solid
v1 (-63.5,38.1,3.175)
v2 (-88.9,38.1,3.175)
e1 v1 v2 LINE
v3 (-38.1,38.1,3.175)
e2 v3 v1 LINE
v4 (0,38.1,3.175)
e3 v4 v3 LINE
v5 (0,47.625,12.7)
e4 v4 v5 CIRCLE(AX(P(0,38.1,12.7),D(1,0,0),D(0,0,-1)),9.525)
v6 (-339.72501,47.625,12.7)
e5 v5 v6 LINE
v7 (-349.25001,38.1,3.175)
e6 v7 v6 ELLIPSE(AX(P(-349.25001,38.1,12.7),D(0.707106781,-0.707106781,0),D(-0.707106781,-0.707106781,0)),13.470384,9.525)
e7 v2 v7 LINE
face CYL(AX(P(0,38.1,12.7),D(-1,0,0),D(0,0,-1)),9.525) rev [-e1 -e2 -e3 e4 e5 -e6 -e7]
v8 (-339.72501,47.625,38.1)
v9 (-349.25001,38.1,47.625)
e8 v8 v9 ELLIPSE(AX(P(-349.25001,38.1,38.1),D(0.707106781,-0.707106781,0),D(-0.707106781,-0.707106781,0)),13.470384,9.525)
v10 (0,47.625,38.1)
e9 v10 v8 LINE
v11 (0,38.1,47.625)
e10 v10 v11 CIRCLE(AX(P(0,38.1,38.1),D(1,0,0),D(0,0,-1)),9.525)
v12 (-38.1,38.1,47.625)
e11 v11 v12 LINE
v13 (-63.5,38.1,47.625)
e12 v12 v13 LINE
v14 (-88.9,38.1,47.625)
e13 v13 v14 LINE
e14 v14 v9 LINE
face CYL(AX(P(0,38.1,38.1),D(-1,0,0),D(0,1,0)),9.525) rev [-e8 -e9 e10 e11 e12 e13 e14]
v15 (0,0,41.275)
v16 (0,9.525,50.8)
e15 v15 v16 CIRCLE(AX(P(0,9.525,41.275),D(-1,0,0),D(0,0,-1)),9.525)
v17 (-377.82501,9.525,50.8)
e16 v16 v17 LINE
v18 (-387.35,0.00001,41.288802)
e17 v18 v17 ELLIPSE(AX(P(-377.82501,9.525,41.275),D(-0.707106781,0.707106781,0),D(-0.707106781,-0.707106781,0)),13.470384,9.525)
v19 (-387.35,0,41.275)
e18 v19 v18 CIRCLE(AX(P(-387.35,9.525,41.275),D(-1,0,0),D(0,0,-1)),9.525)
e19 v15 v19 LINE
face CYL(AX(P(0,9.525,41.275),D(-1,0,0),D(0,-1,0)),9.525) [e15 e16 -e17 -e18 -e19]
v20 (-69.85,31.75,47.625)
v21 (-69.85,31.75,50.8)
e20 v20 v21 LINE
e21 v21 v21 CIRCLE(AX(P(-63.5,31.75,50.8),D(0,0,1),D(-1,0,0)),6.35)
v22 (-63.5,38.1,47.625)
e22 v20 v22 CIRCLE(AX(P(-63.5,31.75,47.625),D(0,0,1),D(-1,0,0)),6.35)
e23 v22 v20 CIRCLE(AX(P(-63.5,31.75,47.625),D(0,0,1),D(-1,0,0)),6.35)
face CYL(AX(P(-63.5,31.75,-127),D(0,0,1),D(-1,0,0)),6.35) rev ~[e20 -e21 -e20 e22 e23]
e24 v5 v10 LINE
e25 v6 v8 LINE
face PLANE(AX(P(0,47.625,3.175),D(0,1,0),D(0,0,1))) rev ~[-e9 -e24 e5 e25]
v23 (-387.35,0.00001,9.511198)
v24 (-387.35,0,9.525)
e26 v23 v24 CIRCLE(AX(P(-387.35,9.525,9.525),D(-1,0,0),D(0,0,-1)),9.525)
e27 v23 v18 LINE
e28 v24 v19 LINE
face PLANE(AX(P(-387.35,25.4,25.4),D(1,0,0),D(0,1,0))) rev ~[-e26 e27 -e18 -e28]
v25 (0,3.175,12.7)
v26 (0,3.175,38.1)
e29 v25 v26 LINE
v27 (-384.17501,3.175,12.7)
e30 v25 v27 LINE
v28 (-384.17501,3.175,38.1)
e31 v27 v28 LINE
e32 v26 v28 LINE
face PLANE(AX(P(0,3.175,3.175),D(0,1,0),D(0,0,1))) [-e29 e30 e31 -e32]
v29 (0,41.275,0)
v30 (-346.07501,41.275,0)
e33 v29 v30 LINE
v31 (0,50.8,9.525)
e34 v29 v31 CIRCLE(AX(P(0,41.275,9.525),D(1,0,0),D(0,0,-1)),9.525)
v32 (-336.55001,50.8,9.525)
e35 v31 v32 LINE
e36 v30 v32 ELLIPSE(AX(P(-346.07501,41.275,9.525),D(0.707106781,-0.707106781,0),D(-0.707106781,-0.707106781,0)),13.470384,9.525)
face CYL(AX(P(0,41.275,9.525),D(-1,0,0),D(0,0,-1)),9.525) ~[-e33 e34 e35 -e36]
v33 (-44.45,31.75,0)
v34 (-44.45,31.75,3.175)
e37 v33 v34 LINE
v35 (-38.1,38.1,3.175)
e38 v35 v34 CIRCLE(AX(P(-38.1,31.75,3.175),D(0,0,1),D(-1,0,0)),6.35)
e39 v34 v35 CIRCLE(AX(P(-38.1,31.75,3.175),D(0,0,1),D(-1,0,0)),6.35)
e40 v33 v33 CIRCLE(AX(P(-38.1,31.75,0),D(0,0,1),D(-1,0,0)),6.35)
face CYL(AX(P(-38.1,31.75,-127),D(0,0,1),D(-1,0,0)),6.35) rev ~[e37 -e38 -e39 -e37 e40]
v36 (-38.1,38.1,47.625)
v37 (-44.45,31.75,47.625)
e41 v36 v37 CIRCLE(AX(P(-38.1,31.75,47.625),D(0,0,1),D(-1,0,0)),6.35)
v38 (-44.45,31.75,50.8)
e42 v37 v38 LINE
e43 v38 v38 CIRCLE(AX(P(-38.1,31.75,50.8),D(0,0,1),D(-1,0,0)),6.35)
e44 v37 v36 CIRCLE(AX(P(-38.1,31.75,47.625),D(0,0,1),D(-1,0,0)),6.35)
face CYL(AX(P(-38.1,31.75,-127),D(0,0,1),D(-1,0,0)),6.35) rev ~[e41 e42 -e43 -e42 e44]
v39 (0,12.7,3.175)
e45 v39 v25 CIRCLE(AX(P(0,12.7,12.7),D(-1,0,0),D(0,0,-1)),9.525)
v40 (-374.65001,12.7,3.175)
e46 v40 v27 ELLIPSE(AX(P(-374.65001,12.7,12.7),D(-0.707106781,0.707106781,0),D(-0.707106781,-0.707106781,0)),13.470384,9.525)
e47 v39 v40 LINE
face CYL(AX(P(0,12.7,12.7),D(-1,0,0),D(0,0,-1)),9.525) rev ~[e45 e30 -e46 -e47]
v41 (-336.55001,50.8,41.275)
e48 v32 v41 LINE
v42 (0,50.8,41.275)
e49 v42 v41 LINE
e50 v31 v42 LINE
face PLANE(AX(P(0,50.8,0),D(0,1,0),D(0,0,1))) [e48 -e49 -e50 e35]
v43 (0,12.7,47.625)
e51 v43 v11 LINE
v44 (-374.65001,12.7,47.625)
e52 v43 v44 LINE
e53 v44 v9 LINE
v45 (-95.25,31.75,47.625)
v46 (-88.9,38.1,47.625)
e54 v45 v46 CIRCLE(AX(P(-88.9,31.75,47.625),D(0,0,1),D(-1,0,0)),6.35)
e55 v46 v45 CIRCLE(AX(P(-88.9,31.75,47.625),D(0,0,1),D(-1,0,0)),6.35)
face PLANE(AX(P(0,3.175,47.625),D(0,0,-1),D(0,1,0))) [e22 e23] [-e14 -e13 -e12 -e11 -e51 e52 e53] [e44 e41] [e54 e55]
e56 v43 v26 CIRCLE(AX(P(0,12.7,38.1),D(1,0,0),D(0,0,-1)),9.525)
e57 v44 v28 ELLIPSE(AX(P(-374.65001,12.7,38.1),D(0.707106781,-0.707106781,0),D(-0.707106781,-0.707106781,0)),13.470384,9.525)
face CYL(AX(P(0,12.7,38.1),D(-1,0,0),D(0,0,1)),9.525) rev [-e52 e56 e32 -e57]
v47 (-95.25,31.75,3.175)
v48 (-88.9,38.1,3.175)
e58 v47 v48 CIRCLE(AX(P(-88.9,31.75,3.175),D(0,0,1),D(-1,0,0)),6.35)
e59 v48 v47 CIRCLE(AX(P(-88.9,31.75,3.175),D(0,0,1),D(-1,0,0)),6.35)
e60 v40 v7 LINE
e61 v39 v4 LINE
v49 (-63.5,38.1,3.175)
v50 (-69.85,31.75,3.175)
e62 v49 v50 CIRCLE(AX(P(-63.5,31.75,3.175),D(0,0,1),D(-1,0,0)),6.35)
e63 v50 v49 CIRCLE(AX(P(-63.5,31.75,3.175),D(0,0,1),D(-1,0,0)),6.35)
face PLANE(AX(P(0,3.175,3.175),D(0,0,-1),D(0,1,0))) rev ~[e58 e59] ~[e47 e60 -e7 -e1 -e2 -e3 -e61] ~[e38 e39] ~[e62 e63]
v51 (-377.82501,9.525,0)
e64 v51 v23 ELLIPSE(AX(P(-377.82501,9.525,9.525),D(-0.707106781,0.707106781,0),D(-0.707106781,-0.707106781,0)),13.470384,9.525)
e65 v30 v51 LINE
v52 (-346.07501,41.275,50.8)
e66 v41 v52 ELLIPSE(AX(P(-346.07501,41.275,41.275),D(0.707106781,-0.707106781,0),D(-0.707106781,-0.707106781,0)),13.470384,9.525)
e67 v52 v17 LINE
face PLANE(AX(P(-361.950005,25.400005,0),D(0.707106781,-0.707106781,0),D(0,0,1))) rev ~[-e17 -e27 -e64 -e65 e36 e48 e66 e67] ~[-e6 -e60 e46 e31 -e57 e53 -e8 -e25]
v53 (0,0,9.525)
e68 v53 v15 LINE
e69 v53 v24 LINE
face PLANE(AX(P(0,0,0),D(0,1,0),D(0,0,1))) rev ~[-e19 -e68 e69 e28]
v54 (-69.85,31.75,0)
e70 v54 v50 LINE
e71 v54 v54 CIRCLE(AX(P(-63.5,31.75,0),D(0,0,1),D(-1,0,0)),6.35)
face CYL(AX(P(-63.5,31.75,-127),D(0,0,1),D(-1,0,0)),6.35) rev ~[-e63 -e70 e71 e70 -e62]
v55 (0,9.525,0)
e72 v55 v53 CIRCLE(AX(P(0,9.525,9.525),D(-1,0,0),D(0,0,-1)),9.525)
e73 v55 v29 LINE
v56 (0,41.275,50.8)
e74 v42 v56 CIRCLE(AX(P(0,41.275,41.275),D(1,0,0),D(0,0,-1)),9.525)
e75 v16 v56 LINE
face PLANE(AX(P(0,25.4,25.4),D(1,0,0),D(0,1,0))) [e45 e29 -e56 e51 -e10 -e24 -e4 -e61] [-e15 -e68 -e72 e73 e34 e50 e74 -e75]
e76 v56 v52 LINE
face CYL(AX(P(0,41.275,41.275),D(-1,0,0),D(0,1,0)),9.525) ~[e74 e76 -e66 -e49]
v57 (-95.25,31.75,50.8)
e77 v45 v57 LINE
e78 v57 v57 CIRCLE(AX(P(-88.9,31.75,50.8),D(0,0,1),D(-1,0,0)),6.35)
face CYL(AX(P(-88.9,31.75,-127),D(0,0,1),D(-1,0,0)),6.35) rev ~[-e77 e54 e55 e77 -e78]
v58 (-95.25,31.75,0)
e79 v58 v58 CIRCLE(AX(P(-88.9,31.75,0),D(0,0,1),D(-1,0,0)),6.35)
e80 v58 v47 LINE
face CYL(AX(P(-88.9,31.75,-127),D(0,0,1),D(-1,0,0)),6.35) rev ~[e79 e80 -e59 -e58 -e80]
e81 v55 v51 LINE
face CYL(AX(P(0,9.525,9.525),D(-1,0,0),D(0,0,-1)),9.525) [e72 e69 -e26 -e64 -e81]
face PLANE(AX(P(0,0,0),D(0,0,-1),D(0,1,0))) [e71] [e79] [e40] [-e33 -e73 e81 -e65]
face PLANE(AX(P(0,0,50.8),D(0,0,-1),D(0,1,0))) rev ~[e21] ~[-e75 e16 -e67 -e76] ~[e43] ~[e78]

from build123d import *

# Parameters (mm, degrees)
F0_W     = 50.8
F0_H     = 50.8
F1_DEPTH = 387.35
F2_SIZE  = 50.79999
F3_W     = 44.45
F3_H     = 44.45
F4_DEPTH = 876.3
F5_R     = 9.525
F7_D     = 12.7
F7_DEPTH = 127
F7_TIP   = 3.8154649308


# Not quite as in the source:
# - a fillet or chamfer is up to 0.001 mm smaller than in the source, because OpenCascade refuses the exact size


with BuildPart() as f1:
    # F0 (on Right) → F1 (new body)
    with BuildSketch(Plane.YZ):
        with Locations((25.4, 25.4)):
            Rectangle(F0_W, F0_H)
    extrude(amount=-F1_DEPTH)

    # F2 (size 50.8 in the source; OpenCascade refuses exactly that, so slightly less here)
    f2_edges = [f1.edges().sort_by_distance(p)[0] for p in [
        (-387.35, 50.8, 25.4),
    ]]
    chamfer(f2_edges, length=F2_SIZE)

    # F3 (on face) → F4 (cut)
    with BuildSketch(Plane.YZ):
        with Locations((25.4, 25.4)):
            Rectangle(F3_W, F3_H)
    extrude(amount=-F4_DEPTH, mode=Mode.SUBTRACT)

    # F5
    f5_edges = [f1.edges().sort_by_distance(p)[0] for p in [
        (-192.087505, 3.175, 3.175),
        (-169.862505, 47.625, 3.175),
        (-169.862505, 47.625, 47.625),
        (-192.087505, 3.175, 47.625),
        (-168.275005, 50.8, 0),
        (-168.275005, 50.8, 50.8),
        (-193.675, 0, 50.8),
        (-193.675, 0, 0),
    ]]
    fillet(f5_edges, radius=F5_R)

    # F7
    with Locations(Plane(origin=(0, 0, 0), x_dir=(1, 0, 0), z_dir=(0, 0, -1))):
        with Locations((-38.1, -31.75), (-63.5, -31.75), (-88.9, -31.75)):
            Hole(F7_D / 2, depth=F7_DEPTH)
            with Locations((0, 0, -(F7_DEPTH + F7_TIP / 2))):  # 118° drill point
                Cone(0, F7_D / 2, F7_TIP, mode=Mode.SUBTRACT)


solid = f1.part
